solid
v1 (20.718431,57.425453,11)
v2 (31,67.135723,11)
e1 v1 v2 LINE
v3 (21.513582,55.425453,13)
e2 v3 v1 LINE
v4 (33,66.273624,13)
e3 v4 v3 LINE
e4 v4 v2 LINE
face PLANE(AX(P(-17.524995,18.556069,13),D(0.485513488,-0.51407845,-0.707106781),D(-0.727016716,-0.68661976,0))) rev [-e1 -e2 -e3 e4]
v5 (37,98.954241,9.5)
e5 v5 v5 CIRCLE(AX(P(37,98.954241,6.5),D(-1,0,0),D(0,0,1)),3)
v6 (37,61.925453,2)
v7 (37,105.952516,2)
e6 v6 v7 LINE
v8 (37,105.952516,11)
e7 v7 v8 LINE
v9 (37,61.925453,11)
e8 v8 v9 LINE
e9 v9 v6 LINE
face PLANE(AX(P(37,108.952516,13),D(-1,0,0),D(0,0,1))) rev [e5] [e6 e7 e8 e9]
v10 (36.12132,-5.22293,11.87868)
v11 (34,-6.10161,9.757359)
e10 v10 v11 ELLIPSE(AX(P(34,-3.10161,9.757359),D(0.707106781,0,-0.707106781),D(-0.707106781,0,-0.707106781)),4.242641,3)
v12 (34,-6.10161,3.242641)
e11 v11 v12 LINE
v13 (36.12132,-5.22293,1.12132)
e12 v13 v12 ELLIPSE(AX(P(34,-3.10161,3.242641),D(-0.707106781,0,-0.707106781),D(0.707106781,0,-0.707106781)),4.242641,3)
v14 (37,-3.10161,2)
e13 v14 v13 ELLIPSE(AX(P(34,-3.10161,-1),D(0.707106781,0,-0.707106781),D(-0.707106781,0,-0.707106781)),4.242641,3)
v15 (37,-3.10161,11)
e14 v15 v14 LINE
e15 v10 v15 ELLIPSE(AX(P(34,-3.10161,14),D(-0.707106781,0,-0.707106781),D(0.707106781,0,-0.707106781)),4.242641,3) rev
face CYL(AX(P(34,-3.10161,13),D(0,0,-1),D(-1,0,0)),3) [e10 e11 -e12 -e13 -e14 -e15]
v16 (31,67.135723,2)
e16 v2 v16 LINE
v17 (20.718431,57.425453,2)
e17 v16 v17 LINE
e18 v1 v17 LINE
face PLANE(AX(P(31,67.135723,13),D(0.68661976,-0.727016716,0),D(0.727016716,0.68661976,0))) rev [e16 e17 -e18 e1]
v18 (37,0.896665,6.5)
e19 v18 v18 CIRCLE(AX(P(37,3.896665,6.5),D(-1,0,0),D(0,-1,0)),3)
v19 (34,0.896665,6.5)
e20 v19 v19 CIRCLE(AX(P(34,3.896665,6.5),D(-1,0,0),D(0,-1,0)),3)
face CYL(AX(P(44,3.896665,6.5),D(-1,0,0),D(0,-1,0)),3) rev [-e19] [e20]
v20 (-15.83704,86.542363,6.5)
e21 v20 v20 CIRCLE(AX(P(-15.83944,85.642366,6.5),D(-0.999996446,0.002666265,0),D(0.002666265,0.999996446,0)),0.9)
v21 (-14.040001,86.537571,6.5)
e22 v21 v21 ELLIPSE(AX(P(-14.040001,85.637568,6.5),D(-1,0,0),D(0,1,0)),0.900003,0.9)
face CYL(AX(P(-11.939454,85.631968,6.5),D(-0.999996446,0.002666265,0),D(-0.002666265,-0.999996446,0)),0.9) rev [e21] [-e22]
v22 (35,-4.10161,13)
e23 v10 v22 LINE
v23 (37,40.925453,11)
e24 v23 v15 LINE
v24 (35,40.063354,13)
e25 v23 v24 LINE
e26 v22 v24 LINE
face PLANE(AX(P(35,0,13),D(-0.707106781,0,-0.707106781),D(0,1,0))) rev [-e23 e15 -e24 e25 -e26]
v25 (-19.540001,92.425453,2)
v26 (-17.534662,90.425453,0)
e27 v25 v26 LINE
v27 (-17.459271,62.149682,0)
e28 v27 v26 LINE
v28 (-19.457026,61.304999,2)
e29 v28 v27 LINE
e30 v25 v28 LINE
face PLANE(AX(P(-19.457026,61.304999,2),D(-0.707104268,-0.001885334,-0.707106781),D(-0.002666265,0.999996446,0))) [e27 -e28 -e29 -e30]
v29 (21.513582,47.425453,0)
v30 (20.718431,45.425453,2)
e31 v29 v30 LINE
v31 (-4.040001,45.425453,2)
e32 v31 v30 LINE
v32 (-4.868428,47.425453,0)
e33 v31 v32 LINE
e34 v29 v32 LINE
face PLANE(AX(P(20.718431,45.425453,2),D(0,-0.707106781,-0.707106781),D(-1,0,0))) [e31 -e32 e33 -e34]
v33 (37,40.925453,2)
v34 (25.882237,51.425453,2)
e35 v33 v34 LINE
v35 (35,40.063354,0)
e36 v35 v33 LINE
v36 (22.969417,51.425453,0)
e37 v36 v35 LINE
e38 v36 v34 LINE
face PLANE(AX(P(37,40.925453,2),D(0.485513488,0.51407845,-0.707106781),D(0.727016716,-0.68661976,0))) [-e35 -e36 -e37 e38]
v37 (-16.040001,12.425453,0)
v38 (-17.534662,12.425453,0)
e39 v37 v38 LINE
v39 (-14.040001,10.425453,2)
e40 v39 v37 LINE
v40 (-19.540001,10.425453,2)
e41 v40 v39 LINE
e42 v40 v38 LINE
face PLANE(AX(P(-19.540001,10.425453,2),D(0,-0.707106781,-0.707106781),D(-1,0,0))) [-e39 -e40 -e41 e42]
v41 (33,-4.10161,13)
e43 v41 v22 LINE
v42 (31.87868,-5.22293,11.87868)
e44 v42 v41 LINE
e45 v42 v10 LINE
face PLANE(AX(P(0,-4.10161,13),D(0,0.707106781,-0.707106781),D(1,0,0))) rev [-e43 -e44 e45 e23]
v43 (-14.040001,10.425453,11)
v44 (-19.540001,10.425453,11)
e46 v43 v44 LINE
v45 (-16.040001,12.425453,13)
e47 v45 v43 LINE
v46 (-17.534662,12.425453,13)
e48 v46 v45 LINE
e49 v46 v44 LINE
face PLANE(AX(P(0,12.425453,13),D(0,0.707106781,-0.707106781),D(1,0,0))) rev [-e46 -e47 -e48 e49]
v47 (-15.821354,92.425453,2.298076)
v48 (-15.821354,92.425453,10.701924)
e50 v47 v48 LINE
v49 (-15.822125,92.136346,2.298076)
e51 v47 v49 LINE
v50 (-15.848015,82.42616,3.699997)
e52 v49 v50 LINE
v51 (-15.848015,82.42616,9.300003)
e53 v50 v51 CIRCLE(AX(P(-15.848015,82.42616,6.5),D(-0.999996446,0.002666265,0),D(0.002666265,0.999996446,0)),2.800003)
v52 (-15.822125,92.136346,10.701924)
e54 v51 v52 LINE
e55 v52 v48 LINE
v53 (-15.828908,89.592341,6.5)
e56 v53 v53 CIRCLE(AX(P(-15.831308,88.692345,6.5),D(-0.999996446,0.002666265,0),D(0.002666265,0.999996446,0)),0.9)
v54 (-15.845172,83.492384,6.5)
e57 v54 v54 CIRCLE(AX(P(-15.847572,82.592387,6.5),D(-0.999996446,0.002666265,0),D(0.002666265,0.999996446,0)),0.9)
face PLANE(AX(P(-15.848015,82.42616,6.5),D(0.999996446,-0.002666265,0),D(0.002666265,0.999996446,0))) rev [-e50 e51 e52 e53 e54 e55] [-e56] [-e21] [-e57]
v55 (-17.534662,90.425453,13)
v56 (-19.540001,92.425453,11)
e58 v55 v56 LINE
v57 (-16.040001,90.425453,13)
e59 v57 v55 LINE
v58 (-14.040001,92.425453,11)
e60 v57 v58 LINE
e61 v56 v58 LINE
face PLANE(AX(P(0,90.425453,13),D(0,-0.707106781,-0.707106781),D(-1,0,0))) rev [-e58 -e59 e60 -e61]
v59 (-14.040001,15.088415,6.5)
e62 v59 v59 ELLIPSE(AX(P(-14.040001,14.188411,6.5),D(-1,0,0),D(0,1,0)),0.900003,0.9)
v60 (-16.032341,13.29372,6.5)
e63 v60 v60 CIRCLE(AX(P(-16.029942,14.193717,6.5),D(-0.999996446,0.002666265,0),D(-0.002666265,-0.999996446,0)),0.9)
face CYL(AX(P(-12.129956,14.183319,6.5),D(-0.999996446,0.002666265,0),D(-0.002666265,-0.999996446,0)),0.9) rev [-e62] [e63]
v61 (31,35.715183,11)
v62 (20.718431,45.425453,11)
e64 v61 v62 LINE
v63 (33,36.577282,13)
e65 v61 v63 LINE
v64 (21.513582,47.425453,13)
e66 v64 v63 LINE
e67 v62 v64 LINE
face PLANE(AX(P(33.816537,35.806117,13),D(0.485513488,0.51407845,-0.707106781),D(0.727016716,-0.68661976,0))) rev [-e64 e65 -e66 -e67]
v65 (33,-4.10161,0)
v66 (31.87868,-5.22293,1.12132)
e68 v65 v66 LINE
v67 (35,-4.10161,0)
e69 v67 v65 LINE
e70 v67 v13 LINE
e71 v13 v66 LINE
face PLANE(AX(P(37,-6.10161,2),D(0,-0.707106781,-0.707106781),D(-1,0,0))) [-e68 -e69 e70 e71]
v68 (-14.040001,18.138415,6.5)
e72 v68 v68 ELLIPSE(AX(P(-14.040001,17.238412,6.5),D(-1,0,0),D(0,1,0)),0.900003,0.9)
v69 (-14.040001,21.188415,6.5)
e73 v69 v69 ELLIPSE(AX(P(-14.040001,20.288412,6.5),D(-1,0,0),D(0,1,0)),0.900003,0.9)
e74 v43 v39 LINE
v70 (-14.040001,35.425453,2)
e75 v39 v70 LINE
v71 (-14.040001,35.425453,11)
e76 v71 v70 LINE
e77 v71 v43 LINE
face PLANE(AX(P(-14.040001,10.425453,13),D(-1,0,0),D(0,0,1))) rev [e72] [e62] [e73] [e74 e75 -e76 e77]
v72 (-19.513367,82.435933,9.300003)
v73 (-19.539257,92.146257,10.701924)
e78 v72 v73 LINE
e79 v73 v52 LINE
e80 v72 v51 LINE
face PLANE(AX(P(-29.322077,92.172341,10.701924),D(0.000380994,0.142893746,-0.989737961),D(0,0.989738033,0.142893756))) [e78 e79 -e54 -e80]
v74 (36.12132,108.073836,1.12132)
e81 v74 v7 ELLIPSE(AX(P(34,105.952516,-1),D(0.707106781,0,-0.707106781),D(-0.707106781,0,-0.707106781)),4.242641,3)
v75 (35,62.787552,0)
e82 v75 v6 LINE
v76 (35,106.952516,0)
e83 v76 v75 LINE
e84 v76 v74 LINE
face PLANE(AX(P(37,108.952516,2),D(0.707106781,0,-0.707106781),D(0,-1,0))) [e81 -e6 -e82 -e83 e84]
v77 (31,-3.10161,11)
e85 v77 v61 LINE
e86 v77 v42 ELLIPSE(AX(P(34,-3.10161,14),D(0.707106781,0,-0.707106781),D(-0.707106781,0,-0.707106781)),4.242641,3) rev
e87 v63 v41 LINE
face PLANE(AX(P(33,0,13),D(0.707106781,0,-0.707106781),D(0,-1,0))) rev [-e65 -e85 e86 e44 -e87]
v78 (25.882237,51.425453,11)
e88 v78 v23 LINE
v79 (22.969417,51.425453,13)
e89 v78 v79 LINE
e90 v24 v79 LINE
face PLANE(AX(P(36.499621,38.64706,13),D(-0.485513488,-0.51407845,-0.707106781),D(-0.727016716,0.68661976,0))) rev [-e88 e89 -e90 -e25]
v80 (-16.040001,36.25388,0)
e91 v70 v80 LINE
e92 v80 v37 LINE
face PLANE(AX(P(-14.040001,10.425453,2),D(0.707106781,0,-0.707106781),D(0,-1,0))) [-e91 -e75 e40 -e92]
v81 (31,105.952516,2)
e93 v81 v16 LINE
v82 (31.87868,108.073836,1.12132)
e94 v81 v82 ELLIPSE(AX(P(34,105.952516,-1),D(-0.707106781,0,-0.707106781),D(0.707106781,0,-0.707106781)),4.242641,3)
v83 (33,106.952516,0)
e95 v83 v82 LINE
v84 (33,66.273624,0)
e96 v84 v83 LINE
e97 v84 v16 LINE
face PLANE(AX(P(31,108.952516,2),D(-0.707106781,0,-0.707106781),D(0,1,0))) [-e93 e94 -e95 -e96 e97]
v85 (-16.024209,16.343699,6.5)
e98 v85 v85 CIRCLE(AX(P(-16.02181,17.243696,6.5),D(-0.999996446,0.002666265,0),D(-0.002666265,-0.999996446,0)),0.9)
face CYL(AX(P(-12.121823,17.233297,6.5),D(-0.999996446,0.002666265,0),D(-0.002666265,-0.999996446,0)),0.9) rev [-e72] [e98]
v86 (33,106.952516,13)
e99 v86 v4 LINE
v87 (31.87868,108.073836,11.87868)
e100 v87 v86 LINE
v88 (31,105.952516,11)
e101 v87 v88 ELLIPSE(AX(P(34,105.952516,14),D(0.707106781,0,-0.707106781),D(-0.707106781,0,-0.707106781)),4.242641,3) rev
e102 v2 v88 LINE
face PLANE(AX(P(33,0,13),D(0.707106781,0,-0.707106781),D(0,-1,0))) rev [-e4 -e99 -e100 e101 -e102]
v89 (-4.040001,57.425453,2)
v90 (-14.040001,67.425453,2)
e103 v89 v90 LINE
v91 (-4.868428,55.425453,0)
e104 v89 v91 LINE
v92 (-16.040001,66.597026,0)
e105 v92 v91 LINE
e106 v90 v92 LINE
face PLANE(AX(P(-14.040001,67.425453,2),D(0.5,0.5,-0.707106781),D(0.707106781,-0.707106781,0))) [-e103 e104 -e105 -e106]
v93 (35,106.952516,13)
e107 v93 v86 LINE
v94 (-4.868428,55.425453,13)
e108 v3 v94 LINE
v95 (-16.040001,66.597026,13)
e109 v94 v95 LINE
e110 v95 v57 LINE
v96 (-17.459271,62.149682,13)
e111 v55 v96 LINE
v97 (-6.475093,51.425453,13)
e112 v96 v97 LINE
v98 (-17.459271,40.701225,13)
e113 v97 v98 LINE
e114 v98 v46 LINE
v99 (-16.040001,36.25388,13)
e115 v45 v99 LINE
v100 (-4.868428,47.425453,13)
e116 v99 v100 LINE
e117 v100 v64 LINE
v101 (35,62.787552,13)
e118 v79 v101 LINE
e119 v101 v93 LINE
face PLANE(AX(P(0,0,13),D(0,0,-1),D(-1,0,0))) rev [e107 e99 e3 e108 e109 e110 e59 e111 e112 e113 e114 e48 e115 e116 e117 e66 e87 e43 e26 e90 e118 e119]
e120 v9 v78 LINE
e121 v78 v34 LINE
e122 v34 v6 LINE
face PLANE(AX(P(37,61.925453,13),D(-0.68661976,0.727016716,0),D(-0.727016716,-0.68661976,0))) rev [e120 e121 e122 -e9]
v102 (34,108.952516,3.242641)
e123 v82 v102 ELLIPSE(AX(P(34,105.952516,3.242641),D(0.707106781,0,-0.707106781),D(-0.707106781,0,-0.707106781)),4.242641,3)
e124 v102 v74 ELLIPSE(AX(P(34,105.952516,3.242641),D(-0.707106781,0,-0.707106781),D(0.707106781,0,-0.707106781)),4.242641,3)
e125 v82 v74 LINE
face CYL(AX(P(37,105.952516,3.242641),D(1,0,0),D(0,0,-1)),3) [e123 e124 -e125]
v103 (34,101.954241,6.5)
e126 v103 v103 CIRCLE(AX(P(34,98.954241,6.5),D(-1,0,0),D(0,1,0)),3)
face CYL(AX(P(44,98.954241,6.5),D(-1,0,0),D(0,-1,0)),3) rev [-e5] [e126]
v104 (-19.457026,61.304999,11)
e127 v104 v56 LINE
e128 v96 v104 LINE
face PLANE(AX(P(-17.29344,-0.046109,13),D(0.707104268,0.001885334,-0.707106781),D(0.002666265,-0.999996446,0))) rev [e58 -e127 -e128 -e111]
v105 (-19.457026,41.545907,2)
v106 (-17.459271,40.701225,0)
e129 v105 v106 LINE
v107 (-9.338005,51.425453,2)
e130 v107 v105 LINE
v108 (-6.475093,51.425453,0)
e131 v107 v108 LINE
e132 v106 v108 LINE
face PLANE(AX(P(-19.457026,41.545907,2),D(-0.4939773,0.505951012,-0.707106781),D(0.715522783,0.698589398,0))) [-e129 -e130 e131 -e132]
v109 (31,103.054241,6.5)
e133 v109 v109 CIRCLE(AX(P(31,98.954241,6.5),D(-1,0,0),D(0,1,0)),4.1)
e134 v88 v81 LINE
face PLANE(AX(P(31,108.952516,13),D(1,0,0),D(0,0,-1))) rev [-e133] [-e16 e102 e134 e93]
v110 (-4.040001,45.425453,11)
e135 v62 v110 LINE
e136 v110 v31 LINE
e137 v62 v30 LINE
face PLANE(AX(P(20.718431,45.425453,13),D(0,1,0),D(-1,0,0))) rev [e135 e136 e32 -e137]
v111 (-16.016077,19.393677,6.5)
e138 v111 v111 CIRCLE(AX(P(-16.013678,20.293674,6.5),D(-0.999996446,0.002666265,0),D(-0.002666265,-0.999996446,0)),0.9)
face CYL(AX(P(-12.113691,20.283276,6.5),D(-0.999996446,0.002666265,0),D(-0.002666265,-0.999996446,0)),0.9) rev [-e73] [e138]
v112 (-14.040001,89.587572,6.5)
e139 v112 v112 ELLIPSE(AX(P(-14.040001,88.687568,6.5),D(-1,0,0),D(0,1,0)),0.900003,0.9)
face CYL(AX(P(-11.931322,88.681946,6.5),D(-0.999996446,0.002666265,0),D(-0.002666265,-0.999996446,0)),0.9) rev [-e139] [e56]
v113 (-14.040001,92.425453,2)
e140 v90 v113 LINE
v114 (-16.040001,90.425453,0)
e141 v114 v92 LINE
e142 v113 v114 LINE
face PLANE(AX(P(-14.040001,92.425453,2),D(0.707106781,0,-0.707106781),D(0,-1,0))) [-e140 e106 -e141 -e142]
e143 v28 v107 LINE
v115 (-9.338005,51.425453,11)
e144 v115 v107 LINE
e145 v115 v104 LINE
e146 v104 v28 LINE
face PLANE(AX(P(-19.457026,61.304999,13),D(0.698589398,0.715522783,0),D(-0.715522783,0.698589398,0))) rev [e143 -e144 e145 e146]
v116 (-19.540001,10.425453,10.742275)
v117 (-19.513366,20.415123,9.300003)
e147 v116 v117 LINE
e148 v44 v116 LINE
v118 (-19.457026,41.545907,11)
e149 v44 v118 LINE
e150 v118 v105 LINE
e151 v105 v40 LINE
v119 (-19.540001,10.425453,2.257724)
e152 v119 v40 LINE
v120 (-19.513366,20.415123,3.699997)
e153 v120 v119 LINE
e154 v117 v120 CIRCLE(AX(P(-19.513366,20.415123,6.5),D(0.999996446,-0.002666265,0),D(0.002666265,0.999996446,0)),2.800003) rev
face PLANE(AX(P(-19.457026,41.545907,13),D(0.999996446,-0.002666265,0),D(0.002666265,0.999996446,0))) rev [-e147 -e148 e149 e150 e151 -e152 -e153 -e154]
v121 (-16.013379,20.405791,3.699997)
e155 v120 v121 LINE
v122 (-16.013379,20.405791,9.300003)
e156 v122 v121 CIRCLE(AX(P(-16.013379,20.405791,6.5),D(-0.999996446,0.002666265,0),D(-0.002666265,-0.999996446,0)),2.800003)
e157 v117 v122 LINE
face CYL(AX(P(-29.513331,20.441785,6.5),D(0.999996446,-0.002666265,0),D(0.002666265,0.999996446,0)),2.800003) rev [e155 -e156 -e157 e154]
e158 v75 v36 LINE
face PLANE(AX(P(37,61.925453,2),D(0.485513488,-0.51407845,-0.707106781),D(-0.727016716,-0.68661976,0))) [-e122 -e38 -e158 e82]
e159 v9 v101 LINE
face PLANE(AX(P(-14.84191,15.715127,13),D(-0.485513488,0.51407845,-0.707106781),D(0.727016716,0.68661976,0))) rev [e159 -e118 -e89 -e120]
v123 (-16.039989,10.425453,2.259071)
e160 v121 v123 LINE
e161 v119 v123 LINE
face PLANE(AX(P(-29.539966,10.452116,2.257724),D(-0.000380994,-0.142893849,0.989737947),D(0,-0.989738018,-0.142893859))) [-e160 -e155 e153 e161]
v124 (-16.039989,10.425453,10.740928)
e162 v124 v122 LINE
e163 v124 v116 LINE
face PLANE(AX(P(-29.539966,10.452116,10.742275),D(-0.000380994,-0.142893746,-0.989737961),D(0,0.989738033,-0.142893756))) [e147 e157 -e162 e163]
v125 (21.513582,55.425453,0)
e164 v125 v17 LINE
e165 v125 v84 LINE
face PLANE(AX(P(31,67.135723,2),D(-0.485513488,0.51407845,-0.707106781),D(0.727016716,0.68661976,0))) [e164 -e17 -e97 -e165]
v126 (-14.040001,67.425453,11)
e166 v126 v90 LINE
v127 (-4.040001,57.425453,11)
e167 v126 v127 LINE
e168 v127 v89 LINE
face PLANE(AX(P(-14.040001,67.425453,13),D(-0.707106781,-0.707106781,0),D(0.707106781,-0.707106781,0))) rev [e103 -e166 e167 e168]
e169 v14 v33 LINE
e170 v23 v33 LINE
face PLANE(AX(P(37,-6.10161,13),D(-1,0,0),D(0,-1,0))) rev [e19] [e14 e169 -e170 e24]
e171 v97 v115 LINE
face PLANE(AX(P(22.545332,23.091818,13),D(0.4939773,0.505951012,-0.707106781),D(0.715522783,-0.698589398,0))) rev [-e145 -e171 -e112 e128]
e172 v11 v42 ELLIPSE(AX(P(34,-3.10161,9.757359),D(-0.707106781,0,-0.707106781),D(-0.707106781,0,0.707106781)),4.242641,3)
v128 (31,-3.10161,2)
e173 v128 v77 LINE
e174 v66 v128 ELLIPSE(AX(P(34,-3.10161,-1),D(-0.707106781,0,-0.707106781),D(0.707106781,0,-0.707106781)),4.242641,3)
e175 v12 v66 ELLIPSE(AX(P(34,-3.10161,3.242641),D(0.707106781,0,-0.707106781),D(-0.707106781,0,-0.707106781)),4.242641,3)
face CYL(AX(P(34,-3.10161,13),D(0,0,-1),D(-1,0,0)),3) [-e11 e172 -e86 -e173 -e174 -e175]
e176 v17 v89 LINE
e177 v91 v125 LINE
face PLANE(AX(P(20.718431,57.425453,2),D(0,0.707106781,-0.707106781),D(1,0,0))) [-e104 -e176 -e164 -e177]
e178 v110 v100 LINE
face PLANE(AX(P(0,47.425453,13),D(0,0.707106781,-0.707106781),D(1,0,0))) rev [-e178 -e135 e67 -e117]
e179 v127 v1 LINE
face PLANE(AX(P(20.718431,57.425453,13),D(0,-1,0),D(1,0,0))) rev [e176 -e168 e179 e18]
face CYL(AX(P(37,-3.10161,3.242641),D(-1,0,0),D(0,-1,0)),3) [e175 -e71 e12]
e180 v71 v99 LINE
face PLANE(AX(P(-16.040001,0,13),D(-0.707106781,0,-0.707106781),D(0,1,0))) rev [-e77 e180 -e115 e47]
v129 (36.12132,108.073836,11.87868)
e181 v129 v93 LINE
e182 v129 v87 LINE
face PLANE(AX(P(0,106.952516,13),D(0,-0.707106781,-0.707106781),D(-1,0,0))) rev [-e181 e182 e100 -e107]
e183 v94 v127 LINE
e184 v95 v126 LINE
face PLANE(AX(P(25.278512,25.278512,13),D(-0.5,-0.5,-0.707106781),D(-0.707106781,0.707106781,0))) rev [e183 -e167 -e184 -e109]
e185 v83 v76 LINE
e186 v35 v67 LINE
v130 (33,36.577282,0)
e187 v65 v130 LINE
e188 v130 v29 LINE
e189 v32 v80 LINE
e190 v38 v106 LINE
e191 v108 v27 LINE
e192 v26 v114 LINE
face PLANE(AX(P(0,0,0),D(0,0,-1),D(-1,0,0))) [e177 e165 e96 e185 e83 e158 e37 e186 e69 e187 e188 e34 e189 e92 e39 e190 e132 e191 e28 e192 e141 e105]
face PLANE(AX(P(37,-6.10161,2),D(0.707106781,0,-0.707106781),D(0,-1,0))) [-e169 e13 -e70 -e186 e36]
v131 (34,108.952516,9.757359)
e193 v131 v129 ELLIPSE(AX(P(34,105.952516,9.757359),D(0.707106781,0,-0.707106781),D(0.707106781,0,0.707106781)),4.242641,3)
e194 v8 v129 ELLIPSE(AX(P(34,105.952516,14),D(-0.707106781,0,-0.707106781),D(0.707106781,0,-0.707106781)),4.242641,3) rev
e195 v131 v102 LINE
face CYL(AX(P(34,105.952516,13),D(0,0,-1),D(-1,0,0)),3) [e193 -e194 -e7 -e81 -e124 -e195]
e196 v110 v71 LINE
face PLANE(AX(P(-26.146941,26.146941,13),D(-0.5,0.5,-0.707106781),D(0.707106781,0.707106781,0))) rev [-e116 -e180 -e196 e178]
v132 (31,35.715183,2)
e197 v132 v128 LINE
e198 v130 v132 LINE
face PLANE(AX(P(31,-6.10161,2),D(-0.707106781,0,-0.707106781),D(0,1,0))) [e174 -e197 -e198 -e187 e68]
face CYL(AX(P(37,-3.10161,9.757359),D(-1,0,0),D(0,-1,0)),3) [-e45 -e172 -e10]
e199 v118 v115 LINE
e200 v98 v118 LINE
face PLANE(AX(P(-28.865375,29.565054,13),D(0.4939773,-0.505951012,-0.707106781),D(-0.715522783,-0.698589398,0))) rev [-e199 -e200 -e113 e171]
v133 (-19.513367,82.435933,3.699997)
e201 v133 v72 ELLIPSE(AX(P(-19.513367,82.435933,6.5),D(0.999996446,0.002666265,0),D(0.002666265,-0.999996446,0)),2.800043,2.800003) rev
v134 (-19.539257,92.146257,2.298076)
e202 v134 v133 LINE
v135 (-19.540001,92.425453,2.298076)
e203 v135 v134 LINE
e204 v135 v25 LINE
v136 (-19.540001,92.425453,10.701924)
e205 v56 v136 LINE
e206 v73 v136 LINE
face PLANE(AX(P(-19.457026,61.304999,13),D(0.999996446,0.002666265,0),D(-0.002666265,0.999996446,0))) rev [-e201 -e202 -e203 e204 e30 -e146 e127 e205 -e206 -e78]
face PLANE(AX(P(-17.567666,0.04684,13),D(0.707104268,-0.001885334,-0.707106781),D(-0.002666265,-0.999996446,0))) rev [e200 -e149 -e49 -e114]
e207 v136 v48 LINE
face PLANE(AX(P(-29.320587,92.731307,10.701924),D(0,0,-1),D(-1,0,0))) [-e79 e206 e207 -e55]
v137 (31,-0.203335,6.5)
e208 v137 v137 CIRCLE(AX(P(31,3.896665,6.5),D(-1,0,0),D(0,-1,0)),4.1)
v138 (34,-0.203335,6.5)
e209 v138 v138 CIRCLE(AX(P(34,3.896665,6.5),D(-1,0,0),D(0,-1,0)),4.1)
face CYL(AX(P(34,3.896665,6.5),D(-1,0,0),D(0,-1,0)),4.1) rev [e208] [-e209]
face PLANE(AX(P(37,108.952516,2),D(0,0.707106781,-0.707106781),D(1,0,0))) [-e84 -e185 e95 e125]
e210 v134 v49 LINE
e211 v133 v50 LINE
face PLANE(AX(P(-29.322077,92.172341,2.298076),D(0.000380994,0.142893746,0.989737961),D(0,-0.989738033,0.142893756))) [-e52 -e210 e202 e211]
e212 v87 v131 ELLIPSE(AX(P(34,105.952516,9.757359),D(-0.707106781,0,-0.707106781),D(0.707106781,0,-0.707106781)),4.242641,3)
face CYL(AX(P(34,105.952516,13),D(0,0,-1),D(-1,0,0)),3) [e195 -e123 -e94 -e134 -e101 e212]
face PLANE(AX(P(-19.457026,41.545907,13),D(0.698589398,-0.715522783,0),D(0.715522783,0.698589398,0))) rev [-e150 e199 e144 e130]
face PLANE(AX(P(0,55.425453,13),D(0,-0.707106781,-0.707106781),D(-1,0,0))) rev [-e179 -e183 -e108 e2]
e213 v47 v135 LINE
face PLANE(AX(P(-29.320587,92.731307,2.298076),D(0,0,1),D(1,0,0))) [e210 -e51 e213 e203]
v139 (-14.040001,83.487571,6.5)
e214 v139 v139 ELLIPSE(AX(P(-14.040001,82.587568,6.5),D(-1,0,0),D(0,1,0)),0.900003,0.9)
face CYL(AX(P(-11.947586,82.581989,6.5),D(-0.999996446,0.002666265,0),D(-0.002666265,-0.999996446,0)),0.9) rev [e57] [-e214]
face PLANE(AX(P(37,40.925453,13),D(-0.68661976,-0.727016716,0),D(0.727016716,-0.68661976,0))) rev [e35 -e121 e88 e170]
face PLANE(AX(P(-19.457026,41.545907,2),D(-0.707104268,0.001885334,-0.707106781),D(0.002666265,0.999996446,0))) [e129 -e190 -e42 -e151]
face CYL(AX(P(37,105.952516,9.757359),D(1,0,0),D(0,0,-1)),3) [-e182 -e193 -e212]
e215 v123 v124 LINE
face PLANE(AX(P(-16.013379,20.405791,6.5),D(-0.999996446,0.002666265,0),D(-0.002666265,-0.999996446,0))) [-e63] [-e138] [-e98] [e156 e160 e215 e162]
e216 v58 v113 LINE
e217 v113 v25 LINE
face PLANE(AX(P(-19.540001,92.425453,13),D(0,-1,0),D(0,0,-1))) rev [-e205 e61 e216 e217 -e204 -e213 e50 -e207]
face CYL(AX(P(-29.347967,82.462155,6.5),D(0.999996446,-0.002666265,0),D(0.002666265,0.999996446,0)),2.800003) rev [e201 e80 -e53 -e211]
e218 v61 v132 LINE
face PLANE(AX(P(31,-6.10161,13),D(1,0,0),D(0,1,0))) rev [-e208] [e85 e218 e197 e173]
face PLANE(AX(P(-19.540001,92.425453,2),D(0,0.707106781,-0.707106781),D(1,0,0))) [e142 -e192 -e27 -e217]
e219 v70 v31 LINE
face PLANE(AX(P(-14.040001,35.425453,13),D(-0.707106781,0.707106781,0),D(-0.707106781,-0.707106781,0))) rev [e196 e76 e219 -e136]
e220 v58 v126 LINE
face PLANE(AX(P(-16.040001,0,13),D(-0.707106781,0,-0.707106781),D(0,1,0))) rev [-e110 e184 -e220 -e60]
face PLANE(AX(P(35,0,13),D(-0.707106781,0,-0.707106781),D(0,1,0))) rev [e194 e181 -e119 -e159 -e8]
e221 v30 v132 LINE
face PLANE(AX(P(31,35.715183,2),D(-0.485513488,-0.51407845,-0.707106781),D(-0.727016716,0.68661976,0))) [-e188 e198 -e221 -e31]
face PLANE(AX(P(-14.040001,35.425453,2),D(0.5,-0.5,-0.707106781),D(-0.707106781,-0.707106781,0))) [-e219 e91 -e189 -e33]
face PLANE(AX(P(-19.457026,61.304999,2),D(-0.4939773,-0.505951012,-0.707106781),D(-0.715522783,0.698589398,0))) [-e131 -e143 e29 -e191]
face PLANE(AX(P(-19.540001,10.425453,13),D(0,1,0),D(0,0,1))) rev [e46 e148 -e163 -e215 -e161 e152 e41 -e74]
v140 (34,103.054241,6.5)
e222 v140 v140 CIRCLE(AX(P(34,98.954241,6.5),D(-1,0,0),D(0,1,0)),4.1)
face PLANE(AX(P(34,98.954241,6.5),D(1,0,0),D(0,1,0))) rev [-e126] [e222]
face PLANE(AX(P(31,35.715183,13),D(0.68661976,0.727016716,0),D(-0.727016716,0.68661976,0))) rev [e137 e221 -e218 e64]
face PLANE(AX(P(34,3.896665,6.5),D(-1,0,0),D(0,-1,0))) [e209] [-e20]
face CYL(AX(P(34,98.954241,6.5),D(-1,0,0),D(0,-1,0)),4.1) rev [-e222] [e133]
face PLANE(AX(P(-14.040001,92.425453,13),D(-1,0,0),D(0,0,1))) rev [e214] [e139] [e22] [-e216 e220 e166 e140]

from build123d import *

# Parameters (mm, degrees)
EXTRUDE_3_DEPTH          = 13
CUT_EXTRUDE_1_DEPTH      = 10
CUT_EXTRUDE_1_DEPTH_BACK = 3.5
SKETCH_5_R               = 0.9
CUT_EXTRUDE_2_DEPTH      = 3.9
SKETCH_7_R               = 4.1
CUT_EXTRUDE_3_DEPTH      = 3
SKETCH_8_R               = 3
CUT_EXTRUDE_4_DEPTH      = 10
CHAMFER_1_SIZE           = 2
FILLET_1_R               = 3


with BuildPart() as part:
    # Эскиз3 → Бобышка-Вытянуть3 (new body)
    with BuildSketch(Plane.XY):
        Polygon((37, -6.101609525), (31, -6.101609525), (31, 35.715183329), (20.718431003, 45.425453097), (-4.040001338, 45.425453097), (-14.040001338, 35.425453097), (-14.040001338, 10.425453097), (-19.540001338, 10.425453097), (-19.457025681, 41.54590709), (-9.338005437, 51.425453097), (-19.457025681, 61.304999103), (-19.540001338, 92.425453097), (-14.040001338, 92.425453097), (-14.040001338, 67.425453097), (-4.040001338, 57.425453097), (20.718431003, 57.425453097), (31, 67.135722864), (31, 108.952515718), (37, 108.952515718), (37, 61.925453097), (25.882237358, 51.425453097), (37, 40.925453097), align=None)
    extrude(amount=EXTRUDE_3_DEPTH)

    # Эскиз4 → Вырез-Вытянуть1 (cut, two sides: drawn at the far end of the back side and taken through both)
    with BuildSketch(Plane(origin=(-19.567659345, 0.052172741, 0), x_dir=(0, 0, 1), z_dir=(-0.9999964455104726, 0.0026662645068428353, 0)).offset(-CUT_EXTRUDE_1_DEPTH_BACK)):
        with BuildLine():
            Line((2.257723781, 10.373317227), (10.742275161, 10.373317227))
            Line((10.742275161, 10.373317227), (9.300003079, 20.36302214))
            ThreePointArc((9.300003079, 20.36302214), (6.5, 23.163025219), (3.699996921, 20.36302214))
            Line((3.699996921, 20.36302214), (2.257723781, 10.373317227))
        make_face()
        with BuildLine():
            Line((10.701924393, 92.093833026), (9.300003079, 82.383612315))
            ThreePointArc((9.300003079, 82.383612315), (6.5, 79.583609236), (3.699996921, 82.383612315))
            Line((3.699996921, 82.383612315), (2.298075607, 92.093833026))
            Line((2.298075607, 92.093833026), (2.298075607, 92.652801429))
            Line((2.298075607, 92.652801429), (10.701924393, 92.652801429))
            Line((10.701924393, 92.652801429), (10.701924393, 92.093833026))
        make_face()
    extrude(amount=CUT_EXTRUDE_1_DEPTH + CUT_EXTRUDE_1_DEPTH_BACK, mode=Mode.SUBTRACT)

    # Эскиз5 → Вырез-Вытянуть2 (cut)
    with BuildSketch(Plane(origin=(-16.067671786, 0.042840815, 0), x_dir=(0, 0, 1), z_dir=(-0.9999964455104726, 0.0026662645068428353, 0))):
        with Locations(Location((6.5, 20.250905412, 0), (0, 0, 270))):
            Circle(SKETCH_5_R)
        with Locations(Location((6.5, 17.200915994, 0), (0, 0, 270))):
            Circle(SKETCH_5_R)
        with Locations(Location((6.5, 14.150926575, 0), (0, 0, 270))):
            Circle(SKETCH_5_R)
        with Locations(Location((6.5, 88.64981885, 0), (0, 0, 90))):
            Circle(SKETCH_5_R)
        with Locations(Location((6.5, 85.599829432, 0), (0, 0, 90))):
            Circle(SKETCH_5_R)
        with Locations(Location((6.5, 82.549840014, 0), (0, 0, 90))):
            Circle(SKETCH_5_R)
    extrude(amount=-CUT_EXTRUDE_2_DEPTH, mode=Mode.SUBTRACT)

    # Эскиз7 → Вырез-Вытянуть3 (cut)
    with BuildSketch(Plane.ZY.offset(-31)):
        with Locations(Location((6.5, 3.89666543, 0), (0, 0, 270))):
            Circle(SKETCH_7_R)
        with Locations(Location((6.5, 98.954240763, 0), (0, 0, 90))):
            Circle(SKETCH_7_R)
    extrude(amount=-CUT_EXTRUDE_3_DEPTH, mode=Mode.SUBTRACT)

    # Эскиз8 → Вырез-Вытянуть4 (cut)
    with BuildSketch(Plane.ZY.offset(-34)):
        with Locations(Location((6.5, 3.89666543, 0), (0, 0, 270))):
            Circle(SKETCH_8_R)
        with Locations((6.5, 98.954240763)):
            Circle(SKETCH_8_R)
    extrude(amount=-CUT_EXTRUDE_4_DEPTH, mode=Mode.SUBTRACT)

    # Фаска1
    chamfer_1_edges = [part.edges().sort_by_distance(p)[0] for p in [
        (25.859215501, 40.570318213, 13),
        (31, 14.806786902, 13),
        (34, -6.101609525, 13),
        (-14.040001338, 22.925453097, 0),
        (37, 17.411921786, 13),
        (-16.790001338, 10.425453097, 0),
        (-19.498513509, 25.985680093, 0),
        (-14.397515559, 46.485680093, 0),
        (-14.397515559, 56.3652261, 0),
        (-19.498513509, 76.8652261, 0),
        (-16.790001338, 92.425453097, 0),
        (-14.040001338, 79.925453097, 0),
        (31.441118679, 46.175453097, 13),
        (-9.040001338, 62.425453097, 0),
        (8.339214833, 57.425453097, 0),
        (25.859215501, 62.28058798, 0),
        (31, 88.044119291, 0),
        (34, 108.952515718, 0),
        (37, 85.438984407, 0),
        (31.441118679, 56.675453097, 0),
        (31.441118679, 46.175453097, 0),
        (31.441118679, 56.675453097, 13),
        (37, 17.411921786, 0),
        (34, -6.101609525, 0),
        (31, 14.806786902, 0),
        (25.859215501, 40.570318213, 0),
        (8.339214833, 45.425453097, 0),
        (-9.040001338, 40.425453097, 0),
        (37, 85.438984407, 13),
        (34, 108.952515718, 13),
        (31, 88.044119291, 13),
        (25.859215501, 62.28058798, 13),
        (-9.040001338, 40.425453097, 13),
        (8.339214833, 57.425453097, 13),
        (-9.040001338, 62.425453097, 13),
        (-14.040001338, 79.925453097, 13),
        (-16.790001338, 92.425453097, 13),
        (-19.498513509, 76.8652261, 13),
        (-14.397515559, 56.3652261, 13),
        (-14.397515559, 46.485680093, 13),
        (-19.498513509, 25.985680093, 13),
        (-16.790001338, 10.425453097, 13),
        (-14.040001338, 22.925453097, 13),
        (8.339214833, 45.425453097, 13),
    ]]
    chamfer(chamfer_1_edges, length=CHAMFER_1_SIZE)

    # Скругление1
    # the kernel refuses this fillet: 3 mm, written as the material it takes off along each edge
    with BuildSketch(Plane(origin=(31, 108.952515718, -5.5), x_dir=(1, 0, 0), z_dir=(0, 0, 1)), Plane(origin=(37, 108.952515718, -5.5), x_dir=(0, -1, 0), z_dir=(0, 0, 1)), Plane(origin=(37, -6.101609525, -5.5), x_dir=(-1, 0, 0), z_dir=(0, 0, 1))) as fillet_1_piece_1:
        with BuildLine():
            CenterArc((FILLET_1_R, -FILLET_1_R), FILLET_1_R, 90, 90)
            Line((0, -FILLET_1_R), (0, 0))
            Line((0, 0), (FILLET_1_R, 0))
        make_face()
    extrude(amount=24, mode=Mode.SUBTRACT)
    with BuildSketch(Plane(origin=(27.893398282, 108.952515718, 2), x_dir=(0, -0.7071067811865495, -0.7071067811865456), z_dir=(1, 0, 0)), Plane(origin=(40.106601718, -6.101609525, 11), x_dir=(0, 0, -1), z_dir=(-1, 0, 0))) as fillet_1_piece_2:
        with BuildLine():
            CenterArc((FILLET_1_R * 0.414213562373, -FILLET_1_R), FILLET_1_R, 90, 45)
            Line((-FILLET_1_R * 0.292893218813, -FILLET_1_R * 0.292893218813), (0, 0))
            Line((0, 0), (FILLET_1_R * 0.414213562373, 0))
        make_face()
    extrude(amount=12.213203436, mode=Mode.SUBTRACT)
    with BuildSketch(Plane(origin=(27.893398282, 108.952515718, 11), x_dir=(0, -0.7071067811865481, 0.7071067811865467), z_dir=(1, 0, 0)), Plane(origin=(40.106601718, -6.101609525, 2), x_dir=(0, 0, 1), z_dir=(-1, 0, 0))) as fillet_1_piece_3:
        with BuildLine():
            CenterArc((FILLET_1_R * 0.414213562373, FILLET_1_R), FILLET_1_R, 225, 45)
            Line((-FILLET_1_R * 0.292893218813, FILLET_1_R * 0.292893218813), (0, 0))
            Line((0, 0), (FILLET_1_R * 0.414213562373, 0))
        make_face()
    extrude(amount=12.213203436, mode=Mode.SUBTRACT)
    with BuildSketch(Plane(origin=(31, -6.101609525, -5.5), x_dir=(1, 0, 0), z_dir=(0, 0, 1))) as fillet_1_piece_4:
        with BuildLine():
            CenterArc((FILLET_1_R, FILLET_1_R), FILLET_1_R, 180, 90)
            Line((0, FILLET_1_R), (0, 0))
            Line((0, 0), (FILLET_1_R, 0))
        make_face()
    extrude(amount=24, mode=Mode.SUBTRACT)


solid = part.part
